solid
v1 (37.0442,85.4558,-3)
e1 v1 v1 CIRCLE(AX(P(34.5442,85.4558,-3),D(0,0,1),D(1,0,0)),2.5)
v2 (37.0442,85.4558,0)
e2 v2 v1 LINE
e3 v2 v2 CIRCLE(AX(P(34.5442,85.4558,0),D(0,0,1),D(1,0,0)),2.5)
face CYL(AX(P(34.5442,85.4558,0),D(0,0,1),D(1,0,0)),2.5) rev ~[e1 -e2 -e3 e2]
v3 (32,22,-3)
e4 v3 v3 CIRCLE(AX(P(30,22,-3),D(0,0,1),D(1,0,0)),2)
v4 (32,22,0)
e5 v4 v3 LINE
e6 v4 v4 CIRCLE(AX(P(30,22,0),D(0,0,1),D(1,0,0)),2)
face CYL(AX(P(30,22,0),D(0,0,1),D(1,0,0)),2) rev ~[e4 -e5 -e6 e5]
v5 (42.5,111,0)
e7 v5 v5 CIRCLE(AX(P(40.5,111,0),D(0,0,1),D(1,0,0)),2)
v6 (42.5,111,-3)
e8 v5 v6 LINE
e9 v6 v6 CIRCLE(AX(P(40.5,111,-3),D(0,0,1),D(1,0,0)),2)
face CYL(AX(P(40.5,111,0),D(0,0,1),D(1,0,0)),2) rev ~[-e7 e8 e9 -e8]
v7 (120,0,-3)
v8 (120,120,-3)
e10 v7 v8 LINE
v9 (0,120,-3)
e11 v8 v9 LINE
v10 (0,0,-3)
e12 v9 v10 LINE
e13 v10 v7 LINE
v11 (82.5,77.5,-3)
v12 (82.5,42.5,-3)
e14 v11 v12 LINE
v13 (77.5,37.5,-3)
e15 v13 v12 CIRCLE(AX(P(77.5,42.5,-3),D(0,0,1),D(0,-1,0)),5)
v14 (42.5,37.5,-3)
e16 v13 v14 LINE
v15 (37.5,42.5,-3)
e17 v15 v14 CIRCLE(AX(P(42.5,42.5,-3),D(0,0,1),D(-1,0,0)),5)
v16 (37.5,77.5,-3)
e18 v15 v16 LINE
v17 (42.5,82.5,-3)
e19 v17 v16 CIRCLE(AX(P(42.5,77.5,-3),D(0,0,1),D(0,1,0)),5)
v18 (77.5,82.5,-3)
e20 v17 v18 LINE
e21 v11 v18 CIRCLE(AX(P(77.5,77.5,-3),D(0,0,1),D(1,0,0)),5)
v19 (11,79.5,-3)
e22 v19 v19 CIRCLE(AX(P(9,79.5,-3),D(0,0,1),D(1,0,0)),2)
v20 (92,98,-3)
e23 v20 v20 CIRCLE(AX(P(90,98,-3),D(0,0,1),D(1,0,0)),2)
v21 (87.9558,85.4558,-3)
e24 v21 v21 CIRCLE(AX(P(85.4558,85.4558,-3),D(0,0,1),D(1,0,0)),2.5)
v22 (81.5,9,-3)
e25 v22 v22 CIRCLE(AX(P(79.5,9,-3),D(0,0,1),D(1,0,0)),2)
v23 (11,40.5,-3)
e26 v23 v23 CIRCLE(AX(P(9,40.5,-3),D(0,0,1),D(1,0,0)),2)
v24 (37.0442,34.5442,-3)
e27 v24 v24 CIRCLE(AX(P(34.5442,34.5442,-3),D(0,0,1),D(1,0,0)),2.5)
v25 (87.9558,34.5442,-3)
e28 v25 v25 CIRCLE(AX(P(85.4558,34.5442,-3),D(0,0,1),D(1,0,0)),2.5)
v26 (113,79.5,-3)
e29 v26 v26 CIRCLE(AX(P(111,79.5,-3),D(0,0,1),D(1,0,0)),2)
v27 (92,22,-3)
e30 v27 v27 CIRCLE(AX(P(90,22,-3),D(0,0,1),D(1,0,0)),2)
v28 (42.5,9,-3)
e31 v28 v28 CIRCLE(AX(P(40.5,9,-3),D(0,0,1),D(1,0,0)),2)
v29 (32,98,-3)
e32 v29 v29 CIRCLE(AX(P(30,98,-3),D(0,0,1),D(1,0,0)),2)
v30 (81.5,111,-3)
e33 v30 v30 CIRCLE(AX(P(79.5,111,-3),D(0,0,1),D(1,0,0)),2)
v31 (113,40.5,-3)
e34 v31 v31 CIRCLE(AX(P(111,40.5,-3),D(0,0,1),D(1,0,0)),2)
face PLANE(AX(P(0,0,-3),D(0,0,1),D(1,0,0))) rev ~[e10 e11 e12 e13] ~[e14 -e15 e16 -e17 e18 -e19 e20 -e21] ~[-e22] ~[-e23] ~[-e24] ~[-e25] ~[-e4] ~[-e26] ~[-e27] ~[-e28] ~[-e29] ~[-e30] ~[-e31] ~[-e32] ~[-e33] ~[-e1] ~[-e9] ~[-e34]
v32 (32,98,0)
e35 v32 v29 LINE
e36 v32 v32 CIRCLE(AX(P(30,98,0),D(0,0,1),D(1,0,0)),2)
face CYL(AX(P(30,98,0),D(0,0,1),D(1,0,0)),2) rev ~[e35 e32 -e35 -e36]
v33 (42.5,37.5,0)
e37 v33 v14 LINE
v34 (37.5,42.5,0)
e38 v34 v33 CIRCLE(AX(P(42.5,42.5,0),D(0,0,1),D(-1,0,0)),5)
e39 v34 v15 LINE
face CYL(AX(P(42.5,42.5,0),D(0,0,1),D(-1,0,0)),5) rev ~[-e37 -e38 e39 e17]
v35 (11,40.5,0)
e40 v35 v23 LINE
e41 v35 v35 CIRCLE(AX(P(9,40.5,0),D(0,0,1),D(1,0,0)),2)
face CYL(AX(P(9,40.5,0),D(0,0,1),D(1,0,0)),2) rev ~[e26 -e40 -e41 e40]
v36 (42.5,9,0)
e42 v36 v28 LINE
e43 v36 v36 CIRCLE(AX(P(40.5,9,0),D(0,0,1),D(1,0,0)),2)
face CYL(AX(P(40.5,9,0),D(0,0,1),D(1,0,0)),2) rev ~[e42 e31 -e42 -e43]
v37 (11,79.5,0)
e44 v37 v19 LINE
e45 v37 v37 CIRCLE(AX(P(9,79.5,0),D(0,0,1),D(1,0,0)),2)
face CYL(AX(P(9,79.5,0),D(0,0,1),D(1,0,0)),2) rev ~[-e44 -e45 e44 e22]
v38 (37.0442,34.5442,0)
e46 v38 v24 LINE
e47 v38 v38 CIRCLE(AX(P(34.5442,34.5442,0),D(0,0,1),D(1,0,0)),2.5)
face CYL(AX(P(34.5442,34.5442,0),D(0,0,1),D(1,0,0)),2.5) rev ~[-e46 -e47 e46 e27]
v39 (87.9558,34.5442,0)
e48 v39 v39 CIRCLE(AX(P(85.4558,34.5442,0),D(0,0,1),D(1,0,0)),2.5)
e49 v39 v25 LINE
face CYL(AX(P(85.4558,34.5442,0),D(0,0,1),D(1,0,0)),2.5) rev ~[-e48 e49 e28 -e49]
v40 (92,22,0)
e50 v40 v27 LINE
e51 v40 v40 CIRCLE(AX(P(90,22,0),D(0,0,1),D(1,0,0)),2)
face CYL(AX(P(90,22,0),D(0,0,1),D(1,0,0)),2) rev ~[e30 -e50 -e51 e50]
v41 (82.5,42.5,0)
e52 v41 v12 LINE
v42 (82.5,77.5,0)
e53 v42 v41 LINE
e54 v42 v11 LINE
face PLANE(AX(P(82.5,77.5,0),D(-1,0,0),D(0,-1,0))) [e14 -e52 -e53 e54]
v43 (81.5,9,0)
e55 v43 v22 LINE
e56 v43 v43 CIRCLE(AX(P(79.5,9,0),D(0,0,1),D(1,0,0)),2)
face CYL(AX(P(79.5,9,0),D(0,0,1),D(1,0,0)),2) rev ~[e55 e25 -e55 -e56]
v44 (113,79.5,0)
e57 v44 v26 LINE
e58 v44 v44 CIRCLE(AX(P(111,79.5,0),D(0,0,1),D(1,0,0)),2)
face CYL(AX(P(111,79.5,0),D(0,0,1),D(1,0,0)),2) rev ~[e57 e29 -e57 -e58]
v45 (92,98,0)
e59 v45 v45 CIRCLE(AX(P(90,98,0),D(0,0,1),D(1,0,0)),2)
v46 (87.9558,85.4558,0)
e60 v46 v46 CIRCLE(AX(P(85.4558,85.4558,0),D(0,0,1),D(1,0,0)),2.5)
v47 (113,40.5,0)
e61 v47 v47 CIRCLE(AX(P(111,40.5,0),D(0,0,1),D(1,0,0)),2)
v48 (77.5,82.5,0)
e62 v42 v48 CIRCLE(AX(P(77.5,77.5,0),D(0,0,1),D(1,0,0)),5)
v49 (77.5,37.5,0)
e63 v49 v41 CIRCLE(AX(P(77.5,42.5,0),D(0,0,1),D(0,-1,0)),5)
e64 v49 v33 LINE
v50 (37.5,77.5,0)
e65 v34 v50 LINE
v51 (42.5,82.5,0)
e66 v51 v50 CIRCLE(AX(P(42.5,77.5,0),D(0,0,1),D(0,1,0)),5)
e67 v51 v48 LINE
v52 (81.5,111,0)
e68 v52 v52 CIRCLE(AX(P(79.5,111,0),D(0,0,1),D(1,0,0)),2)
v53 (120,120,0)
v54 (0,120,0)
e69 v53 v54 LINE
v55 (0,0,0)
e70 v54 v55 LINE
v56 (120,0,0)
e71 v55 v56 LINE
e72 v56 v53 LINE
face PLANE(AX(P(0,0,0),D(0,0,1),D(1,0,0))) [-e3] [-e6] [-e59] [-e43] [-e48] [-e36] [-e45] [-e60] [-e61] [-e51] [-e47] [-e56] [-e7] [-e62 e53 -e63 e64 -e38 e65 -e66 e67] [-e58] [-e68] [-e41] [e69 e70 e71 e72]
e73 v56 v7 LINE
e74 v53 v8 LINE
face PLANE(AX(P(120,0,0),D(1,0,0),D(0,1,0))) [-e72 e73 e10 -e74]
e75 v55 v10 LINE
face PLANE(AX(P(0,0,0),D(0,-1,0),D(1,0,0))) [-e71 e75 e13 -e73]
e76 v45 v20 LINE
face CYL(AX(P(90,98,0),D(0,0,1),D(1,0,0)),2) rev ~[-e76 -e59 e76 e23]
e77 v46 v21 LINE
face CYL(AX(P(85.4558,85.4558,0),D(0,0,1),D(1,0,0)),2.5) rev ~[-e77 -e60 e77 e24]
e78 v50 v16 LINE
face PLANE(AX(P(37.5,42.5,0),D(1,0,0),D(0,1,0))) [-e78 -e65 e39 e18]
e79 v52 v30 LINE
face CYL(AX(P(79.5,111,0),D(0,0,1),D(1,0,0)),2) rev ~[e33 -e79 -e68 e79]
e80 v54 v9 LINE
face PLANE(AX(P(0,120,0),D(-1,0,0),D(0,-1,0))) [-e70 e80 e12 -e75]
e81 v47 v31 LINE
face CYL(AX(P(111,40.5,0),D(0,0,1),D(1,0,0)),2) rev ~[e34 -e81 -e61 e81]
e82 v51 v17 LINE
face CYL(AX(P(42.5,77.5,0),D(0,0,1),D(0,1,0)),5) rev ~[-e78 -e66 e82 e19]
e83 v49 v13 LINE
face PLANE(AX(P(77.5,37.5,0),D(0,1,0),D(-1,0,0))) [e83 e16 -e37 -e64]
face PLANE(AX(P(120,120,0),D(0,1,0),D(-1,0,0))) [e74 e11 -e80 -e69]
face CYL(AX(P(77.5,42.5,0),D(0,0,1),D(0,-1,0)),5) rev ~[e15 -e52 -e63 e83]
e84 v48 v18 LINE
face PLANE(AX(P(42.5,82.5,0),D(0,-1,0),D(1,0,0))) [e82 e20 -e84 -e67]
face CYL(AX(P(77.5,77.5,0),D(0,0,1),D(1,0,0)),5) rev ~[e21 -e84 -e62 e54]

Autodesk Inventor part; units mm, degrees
ref_plane "YZ Plane" through (0, 0, 0) normal (1, 0, 0) x (0, 1, 0)
ref_plane "XZ Plane" through (0, 0, 0) normal (0, 1, 0) x (-1, 0, 0)
ref_plane "XY Plane" through (0, 0, 0) normal (0, 0, 1) x (1, 0, 0)
sketch "Náčrt2" plane through (0, 0, 0) normal (0, 0, 1) x (1, 0, 0)
  line L0 (0, 0) -> (120, 0)
  line L1 (120, 0) -> (120, 120)
  line L2 (120, 120) -> (0, 120)
  line L3 (0, 120) -> (0, 0)
  circle A0 centre (34.5442, 85.4558) radius 2.5
  circle A1 centre (85.4558, 85.4558) radius 2.5
  circle A2 centre (34.5442, 34.5442) radius 2.5
  circle A3 centre (85.4558, 34.5442) radius 2.5
  circle A4 centre (40.5, 111) radius 2
  circle A5 centre (79.5, 111) radius 2
  circle A6 centre (9, 79.5) radius 2
  circle A7 centre (9, 40.5) radius 2
  circle A8 centre (111, 79.5) radius 2
  circle A9 centre (111, 40.5) radius 2
  circle A10 centre (79.5, 9) radius 2
  circle A11 centre (40.5, 9) radius 2
  circle A12 centre (30, 98) radius 2
  circle A13 centre (90, 98) radius 2
  circle A14 centre (90, 22) radius 2
  circle A15 centre (30, 22) radius 2
  line L4 (42.5, 82.5) -> (77.5, 82.5)
  line L5 (82.5, 77.5) -> (82.5, 42.5)
  line L6 (77.5, 37.5) -> (42.5, 37.5)
  line L7 (37.5, 42.5) -> (37.5, 77.5)
  arc A16 (37.5, 42.5) -> (42.5, 37.5) centre (42.5, 42.5) ccw
  arc A17 (77.5, 37.5) -> (82.5, 42.5) centre (77.5, 42.5) ccw
  arc A18 (42.5, 82.5) -> (37.5, 77.5) centre (42.5, 77.5) ccw
  arc A19 (82.5, 77.5) -> (77.5, 82.5) centre (77.5, 77.5) ccw
  point P0 (37.5, 82.5)
  point P1 (82.5, 37.5)
  point P2 (82.5, 82.5)
  point P3 (37.5, 37.5)
  dimension "d18" = 1
  dimension "d26" = 120
  dimension "d27" = 120
  dimension "d28" = 39
  dimension "d29" = 39
  dimension "d30" = 60
  dimension "d31" = 76
  dimension "d32" = 72
  dimension "d35" = 5
  dimension "d36" = 4
  dimension "d37" = 4
  dimension "d42" = 5
  dimension "d43" = 5
  dimension "d44" = 35
extrude "Vysunutí2" add sketch "Náčrt2" against normal blind 3
properties part number "Cougar_Base2"
